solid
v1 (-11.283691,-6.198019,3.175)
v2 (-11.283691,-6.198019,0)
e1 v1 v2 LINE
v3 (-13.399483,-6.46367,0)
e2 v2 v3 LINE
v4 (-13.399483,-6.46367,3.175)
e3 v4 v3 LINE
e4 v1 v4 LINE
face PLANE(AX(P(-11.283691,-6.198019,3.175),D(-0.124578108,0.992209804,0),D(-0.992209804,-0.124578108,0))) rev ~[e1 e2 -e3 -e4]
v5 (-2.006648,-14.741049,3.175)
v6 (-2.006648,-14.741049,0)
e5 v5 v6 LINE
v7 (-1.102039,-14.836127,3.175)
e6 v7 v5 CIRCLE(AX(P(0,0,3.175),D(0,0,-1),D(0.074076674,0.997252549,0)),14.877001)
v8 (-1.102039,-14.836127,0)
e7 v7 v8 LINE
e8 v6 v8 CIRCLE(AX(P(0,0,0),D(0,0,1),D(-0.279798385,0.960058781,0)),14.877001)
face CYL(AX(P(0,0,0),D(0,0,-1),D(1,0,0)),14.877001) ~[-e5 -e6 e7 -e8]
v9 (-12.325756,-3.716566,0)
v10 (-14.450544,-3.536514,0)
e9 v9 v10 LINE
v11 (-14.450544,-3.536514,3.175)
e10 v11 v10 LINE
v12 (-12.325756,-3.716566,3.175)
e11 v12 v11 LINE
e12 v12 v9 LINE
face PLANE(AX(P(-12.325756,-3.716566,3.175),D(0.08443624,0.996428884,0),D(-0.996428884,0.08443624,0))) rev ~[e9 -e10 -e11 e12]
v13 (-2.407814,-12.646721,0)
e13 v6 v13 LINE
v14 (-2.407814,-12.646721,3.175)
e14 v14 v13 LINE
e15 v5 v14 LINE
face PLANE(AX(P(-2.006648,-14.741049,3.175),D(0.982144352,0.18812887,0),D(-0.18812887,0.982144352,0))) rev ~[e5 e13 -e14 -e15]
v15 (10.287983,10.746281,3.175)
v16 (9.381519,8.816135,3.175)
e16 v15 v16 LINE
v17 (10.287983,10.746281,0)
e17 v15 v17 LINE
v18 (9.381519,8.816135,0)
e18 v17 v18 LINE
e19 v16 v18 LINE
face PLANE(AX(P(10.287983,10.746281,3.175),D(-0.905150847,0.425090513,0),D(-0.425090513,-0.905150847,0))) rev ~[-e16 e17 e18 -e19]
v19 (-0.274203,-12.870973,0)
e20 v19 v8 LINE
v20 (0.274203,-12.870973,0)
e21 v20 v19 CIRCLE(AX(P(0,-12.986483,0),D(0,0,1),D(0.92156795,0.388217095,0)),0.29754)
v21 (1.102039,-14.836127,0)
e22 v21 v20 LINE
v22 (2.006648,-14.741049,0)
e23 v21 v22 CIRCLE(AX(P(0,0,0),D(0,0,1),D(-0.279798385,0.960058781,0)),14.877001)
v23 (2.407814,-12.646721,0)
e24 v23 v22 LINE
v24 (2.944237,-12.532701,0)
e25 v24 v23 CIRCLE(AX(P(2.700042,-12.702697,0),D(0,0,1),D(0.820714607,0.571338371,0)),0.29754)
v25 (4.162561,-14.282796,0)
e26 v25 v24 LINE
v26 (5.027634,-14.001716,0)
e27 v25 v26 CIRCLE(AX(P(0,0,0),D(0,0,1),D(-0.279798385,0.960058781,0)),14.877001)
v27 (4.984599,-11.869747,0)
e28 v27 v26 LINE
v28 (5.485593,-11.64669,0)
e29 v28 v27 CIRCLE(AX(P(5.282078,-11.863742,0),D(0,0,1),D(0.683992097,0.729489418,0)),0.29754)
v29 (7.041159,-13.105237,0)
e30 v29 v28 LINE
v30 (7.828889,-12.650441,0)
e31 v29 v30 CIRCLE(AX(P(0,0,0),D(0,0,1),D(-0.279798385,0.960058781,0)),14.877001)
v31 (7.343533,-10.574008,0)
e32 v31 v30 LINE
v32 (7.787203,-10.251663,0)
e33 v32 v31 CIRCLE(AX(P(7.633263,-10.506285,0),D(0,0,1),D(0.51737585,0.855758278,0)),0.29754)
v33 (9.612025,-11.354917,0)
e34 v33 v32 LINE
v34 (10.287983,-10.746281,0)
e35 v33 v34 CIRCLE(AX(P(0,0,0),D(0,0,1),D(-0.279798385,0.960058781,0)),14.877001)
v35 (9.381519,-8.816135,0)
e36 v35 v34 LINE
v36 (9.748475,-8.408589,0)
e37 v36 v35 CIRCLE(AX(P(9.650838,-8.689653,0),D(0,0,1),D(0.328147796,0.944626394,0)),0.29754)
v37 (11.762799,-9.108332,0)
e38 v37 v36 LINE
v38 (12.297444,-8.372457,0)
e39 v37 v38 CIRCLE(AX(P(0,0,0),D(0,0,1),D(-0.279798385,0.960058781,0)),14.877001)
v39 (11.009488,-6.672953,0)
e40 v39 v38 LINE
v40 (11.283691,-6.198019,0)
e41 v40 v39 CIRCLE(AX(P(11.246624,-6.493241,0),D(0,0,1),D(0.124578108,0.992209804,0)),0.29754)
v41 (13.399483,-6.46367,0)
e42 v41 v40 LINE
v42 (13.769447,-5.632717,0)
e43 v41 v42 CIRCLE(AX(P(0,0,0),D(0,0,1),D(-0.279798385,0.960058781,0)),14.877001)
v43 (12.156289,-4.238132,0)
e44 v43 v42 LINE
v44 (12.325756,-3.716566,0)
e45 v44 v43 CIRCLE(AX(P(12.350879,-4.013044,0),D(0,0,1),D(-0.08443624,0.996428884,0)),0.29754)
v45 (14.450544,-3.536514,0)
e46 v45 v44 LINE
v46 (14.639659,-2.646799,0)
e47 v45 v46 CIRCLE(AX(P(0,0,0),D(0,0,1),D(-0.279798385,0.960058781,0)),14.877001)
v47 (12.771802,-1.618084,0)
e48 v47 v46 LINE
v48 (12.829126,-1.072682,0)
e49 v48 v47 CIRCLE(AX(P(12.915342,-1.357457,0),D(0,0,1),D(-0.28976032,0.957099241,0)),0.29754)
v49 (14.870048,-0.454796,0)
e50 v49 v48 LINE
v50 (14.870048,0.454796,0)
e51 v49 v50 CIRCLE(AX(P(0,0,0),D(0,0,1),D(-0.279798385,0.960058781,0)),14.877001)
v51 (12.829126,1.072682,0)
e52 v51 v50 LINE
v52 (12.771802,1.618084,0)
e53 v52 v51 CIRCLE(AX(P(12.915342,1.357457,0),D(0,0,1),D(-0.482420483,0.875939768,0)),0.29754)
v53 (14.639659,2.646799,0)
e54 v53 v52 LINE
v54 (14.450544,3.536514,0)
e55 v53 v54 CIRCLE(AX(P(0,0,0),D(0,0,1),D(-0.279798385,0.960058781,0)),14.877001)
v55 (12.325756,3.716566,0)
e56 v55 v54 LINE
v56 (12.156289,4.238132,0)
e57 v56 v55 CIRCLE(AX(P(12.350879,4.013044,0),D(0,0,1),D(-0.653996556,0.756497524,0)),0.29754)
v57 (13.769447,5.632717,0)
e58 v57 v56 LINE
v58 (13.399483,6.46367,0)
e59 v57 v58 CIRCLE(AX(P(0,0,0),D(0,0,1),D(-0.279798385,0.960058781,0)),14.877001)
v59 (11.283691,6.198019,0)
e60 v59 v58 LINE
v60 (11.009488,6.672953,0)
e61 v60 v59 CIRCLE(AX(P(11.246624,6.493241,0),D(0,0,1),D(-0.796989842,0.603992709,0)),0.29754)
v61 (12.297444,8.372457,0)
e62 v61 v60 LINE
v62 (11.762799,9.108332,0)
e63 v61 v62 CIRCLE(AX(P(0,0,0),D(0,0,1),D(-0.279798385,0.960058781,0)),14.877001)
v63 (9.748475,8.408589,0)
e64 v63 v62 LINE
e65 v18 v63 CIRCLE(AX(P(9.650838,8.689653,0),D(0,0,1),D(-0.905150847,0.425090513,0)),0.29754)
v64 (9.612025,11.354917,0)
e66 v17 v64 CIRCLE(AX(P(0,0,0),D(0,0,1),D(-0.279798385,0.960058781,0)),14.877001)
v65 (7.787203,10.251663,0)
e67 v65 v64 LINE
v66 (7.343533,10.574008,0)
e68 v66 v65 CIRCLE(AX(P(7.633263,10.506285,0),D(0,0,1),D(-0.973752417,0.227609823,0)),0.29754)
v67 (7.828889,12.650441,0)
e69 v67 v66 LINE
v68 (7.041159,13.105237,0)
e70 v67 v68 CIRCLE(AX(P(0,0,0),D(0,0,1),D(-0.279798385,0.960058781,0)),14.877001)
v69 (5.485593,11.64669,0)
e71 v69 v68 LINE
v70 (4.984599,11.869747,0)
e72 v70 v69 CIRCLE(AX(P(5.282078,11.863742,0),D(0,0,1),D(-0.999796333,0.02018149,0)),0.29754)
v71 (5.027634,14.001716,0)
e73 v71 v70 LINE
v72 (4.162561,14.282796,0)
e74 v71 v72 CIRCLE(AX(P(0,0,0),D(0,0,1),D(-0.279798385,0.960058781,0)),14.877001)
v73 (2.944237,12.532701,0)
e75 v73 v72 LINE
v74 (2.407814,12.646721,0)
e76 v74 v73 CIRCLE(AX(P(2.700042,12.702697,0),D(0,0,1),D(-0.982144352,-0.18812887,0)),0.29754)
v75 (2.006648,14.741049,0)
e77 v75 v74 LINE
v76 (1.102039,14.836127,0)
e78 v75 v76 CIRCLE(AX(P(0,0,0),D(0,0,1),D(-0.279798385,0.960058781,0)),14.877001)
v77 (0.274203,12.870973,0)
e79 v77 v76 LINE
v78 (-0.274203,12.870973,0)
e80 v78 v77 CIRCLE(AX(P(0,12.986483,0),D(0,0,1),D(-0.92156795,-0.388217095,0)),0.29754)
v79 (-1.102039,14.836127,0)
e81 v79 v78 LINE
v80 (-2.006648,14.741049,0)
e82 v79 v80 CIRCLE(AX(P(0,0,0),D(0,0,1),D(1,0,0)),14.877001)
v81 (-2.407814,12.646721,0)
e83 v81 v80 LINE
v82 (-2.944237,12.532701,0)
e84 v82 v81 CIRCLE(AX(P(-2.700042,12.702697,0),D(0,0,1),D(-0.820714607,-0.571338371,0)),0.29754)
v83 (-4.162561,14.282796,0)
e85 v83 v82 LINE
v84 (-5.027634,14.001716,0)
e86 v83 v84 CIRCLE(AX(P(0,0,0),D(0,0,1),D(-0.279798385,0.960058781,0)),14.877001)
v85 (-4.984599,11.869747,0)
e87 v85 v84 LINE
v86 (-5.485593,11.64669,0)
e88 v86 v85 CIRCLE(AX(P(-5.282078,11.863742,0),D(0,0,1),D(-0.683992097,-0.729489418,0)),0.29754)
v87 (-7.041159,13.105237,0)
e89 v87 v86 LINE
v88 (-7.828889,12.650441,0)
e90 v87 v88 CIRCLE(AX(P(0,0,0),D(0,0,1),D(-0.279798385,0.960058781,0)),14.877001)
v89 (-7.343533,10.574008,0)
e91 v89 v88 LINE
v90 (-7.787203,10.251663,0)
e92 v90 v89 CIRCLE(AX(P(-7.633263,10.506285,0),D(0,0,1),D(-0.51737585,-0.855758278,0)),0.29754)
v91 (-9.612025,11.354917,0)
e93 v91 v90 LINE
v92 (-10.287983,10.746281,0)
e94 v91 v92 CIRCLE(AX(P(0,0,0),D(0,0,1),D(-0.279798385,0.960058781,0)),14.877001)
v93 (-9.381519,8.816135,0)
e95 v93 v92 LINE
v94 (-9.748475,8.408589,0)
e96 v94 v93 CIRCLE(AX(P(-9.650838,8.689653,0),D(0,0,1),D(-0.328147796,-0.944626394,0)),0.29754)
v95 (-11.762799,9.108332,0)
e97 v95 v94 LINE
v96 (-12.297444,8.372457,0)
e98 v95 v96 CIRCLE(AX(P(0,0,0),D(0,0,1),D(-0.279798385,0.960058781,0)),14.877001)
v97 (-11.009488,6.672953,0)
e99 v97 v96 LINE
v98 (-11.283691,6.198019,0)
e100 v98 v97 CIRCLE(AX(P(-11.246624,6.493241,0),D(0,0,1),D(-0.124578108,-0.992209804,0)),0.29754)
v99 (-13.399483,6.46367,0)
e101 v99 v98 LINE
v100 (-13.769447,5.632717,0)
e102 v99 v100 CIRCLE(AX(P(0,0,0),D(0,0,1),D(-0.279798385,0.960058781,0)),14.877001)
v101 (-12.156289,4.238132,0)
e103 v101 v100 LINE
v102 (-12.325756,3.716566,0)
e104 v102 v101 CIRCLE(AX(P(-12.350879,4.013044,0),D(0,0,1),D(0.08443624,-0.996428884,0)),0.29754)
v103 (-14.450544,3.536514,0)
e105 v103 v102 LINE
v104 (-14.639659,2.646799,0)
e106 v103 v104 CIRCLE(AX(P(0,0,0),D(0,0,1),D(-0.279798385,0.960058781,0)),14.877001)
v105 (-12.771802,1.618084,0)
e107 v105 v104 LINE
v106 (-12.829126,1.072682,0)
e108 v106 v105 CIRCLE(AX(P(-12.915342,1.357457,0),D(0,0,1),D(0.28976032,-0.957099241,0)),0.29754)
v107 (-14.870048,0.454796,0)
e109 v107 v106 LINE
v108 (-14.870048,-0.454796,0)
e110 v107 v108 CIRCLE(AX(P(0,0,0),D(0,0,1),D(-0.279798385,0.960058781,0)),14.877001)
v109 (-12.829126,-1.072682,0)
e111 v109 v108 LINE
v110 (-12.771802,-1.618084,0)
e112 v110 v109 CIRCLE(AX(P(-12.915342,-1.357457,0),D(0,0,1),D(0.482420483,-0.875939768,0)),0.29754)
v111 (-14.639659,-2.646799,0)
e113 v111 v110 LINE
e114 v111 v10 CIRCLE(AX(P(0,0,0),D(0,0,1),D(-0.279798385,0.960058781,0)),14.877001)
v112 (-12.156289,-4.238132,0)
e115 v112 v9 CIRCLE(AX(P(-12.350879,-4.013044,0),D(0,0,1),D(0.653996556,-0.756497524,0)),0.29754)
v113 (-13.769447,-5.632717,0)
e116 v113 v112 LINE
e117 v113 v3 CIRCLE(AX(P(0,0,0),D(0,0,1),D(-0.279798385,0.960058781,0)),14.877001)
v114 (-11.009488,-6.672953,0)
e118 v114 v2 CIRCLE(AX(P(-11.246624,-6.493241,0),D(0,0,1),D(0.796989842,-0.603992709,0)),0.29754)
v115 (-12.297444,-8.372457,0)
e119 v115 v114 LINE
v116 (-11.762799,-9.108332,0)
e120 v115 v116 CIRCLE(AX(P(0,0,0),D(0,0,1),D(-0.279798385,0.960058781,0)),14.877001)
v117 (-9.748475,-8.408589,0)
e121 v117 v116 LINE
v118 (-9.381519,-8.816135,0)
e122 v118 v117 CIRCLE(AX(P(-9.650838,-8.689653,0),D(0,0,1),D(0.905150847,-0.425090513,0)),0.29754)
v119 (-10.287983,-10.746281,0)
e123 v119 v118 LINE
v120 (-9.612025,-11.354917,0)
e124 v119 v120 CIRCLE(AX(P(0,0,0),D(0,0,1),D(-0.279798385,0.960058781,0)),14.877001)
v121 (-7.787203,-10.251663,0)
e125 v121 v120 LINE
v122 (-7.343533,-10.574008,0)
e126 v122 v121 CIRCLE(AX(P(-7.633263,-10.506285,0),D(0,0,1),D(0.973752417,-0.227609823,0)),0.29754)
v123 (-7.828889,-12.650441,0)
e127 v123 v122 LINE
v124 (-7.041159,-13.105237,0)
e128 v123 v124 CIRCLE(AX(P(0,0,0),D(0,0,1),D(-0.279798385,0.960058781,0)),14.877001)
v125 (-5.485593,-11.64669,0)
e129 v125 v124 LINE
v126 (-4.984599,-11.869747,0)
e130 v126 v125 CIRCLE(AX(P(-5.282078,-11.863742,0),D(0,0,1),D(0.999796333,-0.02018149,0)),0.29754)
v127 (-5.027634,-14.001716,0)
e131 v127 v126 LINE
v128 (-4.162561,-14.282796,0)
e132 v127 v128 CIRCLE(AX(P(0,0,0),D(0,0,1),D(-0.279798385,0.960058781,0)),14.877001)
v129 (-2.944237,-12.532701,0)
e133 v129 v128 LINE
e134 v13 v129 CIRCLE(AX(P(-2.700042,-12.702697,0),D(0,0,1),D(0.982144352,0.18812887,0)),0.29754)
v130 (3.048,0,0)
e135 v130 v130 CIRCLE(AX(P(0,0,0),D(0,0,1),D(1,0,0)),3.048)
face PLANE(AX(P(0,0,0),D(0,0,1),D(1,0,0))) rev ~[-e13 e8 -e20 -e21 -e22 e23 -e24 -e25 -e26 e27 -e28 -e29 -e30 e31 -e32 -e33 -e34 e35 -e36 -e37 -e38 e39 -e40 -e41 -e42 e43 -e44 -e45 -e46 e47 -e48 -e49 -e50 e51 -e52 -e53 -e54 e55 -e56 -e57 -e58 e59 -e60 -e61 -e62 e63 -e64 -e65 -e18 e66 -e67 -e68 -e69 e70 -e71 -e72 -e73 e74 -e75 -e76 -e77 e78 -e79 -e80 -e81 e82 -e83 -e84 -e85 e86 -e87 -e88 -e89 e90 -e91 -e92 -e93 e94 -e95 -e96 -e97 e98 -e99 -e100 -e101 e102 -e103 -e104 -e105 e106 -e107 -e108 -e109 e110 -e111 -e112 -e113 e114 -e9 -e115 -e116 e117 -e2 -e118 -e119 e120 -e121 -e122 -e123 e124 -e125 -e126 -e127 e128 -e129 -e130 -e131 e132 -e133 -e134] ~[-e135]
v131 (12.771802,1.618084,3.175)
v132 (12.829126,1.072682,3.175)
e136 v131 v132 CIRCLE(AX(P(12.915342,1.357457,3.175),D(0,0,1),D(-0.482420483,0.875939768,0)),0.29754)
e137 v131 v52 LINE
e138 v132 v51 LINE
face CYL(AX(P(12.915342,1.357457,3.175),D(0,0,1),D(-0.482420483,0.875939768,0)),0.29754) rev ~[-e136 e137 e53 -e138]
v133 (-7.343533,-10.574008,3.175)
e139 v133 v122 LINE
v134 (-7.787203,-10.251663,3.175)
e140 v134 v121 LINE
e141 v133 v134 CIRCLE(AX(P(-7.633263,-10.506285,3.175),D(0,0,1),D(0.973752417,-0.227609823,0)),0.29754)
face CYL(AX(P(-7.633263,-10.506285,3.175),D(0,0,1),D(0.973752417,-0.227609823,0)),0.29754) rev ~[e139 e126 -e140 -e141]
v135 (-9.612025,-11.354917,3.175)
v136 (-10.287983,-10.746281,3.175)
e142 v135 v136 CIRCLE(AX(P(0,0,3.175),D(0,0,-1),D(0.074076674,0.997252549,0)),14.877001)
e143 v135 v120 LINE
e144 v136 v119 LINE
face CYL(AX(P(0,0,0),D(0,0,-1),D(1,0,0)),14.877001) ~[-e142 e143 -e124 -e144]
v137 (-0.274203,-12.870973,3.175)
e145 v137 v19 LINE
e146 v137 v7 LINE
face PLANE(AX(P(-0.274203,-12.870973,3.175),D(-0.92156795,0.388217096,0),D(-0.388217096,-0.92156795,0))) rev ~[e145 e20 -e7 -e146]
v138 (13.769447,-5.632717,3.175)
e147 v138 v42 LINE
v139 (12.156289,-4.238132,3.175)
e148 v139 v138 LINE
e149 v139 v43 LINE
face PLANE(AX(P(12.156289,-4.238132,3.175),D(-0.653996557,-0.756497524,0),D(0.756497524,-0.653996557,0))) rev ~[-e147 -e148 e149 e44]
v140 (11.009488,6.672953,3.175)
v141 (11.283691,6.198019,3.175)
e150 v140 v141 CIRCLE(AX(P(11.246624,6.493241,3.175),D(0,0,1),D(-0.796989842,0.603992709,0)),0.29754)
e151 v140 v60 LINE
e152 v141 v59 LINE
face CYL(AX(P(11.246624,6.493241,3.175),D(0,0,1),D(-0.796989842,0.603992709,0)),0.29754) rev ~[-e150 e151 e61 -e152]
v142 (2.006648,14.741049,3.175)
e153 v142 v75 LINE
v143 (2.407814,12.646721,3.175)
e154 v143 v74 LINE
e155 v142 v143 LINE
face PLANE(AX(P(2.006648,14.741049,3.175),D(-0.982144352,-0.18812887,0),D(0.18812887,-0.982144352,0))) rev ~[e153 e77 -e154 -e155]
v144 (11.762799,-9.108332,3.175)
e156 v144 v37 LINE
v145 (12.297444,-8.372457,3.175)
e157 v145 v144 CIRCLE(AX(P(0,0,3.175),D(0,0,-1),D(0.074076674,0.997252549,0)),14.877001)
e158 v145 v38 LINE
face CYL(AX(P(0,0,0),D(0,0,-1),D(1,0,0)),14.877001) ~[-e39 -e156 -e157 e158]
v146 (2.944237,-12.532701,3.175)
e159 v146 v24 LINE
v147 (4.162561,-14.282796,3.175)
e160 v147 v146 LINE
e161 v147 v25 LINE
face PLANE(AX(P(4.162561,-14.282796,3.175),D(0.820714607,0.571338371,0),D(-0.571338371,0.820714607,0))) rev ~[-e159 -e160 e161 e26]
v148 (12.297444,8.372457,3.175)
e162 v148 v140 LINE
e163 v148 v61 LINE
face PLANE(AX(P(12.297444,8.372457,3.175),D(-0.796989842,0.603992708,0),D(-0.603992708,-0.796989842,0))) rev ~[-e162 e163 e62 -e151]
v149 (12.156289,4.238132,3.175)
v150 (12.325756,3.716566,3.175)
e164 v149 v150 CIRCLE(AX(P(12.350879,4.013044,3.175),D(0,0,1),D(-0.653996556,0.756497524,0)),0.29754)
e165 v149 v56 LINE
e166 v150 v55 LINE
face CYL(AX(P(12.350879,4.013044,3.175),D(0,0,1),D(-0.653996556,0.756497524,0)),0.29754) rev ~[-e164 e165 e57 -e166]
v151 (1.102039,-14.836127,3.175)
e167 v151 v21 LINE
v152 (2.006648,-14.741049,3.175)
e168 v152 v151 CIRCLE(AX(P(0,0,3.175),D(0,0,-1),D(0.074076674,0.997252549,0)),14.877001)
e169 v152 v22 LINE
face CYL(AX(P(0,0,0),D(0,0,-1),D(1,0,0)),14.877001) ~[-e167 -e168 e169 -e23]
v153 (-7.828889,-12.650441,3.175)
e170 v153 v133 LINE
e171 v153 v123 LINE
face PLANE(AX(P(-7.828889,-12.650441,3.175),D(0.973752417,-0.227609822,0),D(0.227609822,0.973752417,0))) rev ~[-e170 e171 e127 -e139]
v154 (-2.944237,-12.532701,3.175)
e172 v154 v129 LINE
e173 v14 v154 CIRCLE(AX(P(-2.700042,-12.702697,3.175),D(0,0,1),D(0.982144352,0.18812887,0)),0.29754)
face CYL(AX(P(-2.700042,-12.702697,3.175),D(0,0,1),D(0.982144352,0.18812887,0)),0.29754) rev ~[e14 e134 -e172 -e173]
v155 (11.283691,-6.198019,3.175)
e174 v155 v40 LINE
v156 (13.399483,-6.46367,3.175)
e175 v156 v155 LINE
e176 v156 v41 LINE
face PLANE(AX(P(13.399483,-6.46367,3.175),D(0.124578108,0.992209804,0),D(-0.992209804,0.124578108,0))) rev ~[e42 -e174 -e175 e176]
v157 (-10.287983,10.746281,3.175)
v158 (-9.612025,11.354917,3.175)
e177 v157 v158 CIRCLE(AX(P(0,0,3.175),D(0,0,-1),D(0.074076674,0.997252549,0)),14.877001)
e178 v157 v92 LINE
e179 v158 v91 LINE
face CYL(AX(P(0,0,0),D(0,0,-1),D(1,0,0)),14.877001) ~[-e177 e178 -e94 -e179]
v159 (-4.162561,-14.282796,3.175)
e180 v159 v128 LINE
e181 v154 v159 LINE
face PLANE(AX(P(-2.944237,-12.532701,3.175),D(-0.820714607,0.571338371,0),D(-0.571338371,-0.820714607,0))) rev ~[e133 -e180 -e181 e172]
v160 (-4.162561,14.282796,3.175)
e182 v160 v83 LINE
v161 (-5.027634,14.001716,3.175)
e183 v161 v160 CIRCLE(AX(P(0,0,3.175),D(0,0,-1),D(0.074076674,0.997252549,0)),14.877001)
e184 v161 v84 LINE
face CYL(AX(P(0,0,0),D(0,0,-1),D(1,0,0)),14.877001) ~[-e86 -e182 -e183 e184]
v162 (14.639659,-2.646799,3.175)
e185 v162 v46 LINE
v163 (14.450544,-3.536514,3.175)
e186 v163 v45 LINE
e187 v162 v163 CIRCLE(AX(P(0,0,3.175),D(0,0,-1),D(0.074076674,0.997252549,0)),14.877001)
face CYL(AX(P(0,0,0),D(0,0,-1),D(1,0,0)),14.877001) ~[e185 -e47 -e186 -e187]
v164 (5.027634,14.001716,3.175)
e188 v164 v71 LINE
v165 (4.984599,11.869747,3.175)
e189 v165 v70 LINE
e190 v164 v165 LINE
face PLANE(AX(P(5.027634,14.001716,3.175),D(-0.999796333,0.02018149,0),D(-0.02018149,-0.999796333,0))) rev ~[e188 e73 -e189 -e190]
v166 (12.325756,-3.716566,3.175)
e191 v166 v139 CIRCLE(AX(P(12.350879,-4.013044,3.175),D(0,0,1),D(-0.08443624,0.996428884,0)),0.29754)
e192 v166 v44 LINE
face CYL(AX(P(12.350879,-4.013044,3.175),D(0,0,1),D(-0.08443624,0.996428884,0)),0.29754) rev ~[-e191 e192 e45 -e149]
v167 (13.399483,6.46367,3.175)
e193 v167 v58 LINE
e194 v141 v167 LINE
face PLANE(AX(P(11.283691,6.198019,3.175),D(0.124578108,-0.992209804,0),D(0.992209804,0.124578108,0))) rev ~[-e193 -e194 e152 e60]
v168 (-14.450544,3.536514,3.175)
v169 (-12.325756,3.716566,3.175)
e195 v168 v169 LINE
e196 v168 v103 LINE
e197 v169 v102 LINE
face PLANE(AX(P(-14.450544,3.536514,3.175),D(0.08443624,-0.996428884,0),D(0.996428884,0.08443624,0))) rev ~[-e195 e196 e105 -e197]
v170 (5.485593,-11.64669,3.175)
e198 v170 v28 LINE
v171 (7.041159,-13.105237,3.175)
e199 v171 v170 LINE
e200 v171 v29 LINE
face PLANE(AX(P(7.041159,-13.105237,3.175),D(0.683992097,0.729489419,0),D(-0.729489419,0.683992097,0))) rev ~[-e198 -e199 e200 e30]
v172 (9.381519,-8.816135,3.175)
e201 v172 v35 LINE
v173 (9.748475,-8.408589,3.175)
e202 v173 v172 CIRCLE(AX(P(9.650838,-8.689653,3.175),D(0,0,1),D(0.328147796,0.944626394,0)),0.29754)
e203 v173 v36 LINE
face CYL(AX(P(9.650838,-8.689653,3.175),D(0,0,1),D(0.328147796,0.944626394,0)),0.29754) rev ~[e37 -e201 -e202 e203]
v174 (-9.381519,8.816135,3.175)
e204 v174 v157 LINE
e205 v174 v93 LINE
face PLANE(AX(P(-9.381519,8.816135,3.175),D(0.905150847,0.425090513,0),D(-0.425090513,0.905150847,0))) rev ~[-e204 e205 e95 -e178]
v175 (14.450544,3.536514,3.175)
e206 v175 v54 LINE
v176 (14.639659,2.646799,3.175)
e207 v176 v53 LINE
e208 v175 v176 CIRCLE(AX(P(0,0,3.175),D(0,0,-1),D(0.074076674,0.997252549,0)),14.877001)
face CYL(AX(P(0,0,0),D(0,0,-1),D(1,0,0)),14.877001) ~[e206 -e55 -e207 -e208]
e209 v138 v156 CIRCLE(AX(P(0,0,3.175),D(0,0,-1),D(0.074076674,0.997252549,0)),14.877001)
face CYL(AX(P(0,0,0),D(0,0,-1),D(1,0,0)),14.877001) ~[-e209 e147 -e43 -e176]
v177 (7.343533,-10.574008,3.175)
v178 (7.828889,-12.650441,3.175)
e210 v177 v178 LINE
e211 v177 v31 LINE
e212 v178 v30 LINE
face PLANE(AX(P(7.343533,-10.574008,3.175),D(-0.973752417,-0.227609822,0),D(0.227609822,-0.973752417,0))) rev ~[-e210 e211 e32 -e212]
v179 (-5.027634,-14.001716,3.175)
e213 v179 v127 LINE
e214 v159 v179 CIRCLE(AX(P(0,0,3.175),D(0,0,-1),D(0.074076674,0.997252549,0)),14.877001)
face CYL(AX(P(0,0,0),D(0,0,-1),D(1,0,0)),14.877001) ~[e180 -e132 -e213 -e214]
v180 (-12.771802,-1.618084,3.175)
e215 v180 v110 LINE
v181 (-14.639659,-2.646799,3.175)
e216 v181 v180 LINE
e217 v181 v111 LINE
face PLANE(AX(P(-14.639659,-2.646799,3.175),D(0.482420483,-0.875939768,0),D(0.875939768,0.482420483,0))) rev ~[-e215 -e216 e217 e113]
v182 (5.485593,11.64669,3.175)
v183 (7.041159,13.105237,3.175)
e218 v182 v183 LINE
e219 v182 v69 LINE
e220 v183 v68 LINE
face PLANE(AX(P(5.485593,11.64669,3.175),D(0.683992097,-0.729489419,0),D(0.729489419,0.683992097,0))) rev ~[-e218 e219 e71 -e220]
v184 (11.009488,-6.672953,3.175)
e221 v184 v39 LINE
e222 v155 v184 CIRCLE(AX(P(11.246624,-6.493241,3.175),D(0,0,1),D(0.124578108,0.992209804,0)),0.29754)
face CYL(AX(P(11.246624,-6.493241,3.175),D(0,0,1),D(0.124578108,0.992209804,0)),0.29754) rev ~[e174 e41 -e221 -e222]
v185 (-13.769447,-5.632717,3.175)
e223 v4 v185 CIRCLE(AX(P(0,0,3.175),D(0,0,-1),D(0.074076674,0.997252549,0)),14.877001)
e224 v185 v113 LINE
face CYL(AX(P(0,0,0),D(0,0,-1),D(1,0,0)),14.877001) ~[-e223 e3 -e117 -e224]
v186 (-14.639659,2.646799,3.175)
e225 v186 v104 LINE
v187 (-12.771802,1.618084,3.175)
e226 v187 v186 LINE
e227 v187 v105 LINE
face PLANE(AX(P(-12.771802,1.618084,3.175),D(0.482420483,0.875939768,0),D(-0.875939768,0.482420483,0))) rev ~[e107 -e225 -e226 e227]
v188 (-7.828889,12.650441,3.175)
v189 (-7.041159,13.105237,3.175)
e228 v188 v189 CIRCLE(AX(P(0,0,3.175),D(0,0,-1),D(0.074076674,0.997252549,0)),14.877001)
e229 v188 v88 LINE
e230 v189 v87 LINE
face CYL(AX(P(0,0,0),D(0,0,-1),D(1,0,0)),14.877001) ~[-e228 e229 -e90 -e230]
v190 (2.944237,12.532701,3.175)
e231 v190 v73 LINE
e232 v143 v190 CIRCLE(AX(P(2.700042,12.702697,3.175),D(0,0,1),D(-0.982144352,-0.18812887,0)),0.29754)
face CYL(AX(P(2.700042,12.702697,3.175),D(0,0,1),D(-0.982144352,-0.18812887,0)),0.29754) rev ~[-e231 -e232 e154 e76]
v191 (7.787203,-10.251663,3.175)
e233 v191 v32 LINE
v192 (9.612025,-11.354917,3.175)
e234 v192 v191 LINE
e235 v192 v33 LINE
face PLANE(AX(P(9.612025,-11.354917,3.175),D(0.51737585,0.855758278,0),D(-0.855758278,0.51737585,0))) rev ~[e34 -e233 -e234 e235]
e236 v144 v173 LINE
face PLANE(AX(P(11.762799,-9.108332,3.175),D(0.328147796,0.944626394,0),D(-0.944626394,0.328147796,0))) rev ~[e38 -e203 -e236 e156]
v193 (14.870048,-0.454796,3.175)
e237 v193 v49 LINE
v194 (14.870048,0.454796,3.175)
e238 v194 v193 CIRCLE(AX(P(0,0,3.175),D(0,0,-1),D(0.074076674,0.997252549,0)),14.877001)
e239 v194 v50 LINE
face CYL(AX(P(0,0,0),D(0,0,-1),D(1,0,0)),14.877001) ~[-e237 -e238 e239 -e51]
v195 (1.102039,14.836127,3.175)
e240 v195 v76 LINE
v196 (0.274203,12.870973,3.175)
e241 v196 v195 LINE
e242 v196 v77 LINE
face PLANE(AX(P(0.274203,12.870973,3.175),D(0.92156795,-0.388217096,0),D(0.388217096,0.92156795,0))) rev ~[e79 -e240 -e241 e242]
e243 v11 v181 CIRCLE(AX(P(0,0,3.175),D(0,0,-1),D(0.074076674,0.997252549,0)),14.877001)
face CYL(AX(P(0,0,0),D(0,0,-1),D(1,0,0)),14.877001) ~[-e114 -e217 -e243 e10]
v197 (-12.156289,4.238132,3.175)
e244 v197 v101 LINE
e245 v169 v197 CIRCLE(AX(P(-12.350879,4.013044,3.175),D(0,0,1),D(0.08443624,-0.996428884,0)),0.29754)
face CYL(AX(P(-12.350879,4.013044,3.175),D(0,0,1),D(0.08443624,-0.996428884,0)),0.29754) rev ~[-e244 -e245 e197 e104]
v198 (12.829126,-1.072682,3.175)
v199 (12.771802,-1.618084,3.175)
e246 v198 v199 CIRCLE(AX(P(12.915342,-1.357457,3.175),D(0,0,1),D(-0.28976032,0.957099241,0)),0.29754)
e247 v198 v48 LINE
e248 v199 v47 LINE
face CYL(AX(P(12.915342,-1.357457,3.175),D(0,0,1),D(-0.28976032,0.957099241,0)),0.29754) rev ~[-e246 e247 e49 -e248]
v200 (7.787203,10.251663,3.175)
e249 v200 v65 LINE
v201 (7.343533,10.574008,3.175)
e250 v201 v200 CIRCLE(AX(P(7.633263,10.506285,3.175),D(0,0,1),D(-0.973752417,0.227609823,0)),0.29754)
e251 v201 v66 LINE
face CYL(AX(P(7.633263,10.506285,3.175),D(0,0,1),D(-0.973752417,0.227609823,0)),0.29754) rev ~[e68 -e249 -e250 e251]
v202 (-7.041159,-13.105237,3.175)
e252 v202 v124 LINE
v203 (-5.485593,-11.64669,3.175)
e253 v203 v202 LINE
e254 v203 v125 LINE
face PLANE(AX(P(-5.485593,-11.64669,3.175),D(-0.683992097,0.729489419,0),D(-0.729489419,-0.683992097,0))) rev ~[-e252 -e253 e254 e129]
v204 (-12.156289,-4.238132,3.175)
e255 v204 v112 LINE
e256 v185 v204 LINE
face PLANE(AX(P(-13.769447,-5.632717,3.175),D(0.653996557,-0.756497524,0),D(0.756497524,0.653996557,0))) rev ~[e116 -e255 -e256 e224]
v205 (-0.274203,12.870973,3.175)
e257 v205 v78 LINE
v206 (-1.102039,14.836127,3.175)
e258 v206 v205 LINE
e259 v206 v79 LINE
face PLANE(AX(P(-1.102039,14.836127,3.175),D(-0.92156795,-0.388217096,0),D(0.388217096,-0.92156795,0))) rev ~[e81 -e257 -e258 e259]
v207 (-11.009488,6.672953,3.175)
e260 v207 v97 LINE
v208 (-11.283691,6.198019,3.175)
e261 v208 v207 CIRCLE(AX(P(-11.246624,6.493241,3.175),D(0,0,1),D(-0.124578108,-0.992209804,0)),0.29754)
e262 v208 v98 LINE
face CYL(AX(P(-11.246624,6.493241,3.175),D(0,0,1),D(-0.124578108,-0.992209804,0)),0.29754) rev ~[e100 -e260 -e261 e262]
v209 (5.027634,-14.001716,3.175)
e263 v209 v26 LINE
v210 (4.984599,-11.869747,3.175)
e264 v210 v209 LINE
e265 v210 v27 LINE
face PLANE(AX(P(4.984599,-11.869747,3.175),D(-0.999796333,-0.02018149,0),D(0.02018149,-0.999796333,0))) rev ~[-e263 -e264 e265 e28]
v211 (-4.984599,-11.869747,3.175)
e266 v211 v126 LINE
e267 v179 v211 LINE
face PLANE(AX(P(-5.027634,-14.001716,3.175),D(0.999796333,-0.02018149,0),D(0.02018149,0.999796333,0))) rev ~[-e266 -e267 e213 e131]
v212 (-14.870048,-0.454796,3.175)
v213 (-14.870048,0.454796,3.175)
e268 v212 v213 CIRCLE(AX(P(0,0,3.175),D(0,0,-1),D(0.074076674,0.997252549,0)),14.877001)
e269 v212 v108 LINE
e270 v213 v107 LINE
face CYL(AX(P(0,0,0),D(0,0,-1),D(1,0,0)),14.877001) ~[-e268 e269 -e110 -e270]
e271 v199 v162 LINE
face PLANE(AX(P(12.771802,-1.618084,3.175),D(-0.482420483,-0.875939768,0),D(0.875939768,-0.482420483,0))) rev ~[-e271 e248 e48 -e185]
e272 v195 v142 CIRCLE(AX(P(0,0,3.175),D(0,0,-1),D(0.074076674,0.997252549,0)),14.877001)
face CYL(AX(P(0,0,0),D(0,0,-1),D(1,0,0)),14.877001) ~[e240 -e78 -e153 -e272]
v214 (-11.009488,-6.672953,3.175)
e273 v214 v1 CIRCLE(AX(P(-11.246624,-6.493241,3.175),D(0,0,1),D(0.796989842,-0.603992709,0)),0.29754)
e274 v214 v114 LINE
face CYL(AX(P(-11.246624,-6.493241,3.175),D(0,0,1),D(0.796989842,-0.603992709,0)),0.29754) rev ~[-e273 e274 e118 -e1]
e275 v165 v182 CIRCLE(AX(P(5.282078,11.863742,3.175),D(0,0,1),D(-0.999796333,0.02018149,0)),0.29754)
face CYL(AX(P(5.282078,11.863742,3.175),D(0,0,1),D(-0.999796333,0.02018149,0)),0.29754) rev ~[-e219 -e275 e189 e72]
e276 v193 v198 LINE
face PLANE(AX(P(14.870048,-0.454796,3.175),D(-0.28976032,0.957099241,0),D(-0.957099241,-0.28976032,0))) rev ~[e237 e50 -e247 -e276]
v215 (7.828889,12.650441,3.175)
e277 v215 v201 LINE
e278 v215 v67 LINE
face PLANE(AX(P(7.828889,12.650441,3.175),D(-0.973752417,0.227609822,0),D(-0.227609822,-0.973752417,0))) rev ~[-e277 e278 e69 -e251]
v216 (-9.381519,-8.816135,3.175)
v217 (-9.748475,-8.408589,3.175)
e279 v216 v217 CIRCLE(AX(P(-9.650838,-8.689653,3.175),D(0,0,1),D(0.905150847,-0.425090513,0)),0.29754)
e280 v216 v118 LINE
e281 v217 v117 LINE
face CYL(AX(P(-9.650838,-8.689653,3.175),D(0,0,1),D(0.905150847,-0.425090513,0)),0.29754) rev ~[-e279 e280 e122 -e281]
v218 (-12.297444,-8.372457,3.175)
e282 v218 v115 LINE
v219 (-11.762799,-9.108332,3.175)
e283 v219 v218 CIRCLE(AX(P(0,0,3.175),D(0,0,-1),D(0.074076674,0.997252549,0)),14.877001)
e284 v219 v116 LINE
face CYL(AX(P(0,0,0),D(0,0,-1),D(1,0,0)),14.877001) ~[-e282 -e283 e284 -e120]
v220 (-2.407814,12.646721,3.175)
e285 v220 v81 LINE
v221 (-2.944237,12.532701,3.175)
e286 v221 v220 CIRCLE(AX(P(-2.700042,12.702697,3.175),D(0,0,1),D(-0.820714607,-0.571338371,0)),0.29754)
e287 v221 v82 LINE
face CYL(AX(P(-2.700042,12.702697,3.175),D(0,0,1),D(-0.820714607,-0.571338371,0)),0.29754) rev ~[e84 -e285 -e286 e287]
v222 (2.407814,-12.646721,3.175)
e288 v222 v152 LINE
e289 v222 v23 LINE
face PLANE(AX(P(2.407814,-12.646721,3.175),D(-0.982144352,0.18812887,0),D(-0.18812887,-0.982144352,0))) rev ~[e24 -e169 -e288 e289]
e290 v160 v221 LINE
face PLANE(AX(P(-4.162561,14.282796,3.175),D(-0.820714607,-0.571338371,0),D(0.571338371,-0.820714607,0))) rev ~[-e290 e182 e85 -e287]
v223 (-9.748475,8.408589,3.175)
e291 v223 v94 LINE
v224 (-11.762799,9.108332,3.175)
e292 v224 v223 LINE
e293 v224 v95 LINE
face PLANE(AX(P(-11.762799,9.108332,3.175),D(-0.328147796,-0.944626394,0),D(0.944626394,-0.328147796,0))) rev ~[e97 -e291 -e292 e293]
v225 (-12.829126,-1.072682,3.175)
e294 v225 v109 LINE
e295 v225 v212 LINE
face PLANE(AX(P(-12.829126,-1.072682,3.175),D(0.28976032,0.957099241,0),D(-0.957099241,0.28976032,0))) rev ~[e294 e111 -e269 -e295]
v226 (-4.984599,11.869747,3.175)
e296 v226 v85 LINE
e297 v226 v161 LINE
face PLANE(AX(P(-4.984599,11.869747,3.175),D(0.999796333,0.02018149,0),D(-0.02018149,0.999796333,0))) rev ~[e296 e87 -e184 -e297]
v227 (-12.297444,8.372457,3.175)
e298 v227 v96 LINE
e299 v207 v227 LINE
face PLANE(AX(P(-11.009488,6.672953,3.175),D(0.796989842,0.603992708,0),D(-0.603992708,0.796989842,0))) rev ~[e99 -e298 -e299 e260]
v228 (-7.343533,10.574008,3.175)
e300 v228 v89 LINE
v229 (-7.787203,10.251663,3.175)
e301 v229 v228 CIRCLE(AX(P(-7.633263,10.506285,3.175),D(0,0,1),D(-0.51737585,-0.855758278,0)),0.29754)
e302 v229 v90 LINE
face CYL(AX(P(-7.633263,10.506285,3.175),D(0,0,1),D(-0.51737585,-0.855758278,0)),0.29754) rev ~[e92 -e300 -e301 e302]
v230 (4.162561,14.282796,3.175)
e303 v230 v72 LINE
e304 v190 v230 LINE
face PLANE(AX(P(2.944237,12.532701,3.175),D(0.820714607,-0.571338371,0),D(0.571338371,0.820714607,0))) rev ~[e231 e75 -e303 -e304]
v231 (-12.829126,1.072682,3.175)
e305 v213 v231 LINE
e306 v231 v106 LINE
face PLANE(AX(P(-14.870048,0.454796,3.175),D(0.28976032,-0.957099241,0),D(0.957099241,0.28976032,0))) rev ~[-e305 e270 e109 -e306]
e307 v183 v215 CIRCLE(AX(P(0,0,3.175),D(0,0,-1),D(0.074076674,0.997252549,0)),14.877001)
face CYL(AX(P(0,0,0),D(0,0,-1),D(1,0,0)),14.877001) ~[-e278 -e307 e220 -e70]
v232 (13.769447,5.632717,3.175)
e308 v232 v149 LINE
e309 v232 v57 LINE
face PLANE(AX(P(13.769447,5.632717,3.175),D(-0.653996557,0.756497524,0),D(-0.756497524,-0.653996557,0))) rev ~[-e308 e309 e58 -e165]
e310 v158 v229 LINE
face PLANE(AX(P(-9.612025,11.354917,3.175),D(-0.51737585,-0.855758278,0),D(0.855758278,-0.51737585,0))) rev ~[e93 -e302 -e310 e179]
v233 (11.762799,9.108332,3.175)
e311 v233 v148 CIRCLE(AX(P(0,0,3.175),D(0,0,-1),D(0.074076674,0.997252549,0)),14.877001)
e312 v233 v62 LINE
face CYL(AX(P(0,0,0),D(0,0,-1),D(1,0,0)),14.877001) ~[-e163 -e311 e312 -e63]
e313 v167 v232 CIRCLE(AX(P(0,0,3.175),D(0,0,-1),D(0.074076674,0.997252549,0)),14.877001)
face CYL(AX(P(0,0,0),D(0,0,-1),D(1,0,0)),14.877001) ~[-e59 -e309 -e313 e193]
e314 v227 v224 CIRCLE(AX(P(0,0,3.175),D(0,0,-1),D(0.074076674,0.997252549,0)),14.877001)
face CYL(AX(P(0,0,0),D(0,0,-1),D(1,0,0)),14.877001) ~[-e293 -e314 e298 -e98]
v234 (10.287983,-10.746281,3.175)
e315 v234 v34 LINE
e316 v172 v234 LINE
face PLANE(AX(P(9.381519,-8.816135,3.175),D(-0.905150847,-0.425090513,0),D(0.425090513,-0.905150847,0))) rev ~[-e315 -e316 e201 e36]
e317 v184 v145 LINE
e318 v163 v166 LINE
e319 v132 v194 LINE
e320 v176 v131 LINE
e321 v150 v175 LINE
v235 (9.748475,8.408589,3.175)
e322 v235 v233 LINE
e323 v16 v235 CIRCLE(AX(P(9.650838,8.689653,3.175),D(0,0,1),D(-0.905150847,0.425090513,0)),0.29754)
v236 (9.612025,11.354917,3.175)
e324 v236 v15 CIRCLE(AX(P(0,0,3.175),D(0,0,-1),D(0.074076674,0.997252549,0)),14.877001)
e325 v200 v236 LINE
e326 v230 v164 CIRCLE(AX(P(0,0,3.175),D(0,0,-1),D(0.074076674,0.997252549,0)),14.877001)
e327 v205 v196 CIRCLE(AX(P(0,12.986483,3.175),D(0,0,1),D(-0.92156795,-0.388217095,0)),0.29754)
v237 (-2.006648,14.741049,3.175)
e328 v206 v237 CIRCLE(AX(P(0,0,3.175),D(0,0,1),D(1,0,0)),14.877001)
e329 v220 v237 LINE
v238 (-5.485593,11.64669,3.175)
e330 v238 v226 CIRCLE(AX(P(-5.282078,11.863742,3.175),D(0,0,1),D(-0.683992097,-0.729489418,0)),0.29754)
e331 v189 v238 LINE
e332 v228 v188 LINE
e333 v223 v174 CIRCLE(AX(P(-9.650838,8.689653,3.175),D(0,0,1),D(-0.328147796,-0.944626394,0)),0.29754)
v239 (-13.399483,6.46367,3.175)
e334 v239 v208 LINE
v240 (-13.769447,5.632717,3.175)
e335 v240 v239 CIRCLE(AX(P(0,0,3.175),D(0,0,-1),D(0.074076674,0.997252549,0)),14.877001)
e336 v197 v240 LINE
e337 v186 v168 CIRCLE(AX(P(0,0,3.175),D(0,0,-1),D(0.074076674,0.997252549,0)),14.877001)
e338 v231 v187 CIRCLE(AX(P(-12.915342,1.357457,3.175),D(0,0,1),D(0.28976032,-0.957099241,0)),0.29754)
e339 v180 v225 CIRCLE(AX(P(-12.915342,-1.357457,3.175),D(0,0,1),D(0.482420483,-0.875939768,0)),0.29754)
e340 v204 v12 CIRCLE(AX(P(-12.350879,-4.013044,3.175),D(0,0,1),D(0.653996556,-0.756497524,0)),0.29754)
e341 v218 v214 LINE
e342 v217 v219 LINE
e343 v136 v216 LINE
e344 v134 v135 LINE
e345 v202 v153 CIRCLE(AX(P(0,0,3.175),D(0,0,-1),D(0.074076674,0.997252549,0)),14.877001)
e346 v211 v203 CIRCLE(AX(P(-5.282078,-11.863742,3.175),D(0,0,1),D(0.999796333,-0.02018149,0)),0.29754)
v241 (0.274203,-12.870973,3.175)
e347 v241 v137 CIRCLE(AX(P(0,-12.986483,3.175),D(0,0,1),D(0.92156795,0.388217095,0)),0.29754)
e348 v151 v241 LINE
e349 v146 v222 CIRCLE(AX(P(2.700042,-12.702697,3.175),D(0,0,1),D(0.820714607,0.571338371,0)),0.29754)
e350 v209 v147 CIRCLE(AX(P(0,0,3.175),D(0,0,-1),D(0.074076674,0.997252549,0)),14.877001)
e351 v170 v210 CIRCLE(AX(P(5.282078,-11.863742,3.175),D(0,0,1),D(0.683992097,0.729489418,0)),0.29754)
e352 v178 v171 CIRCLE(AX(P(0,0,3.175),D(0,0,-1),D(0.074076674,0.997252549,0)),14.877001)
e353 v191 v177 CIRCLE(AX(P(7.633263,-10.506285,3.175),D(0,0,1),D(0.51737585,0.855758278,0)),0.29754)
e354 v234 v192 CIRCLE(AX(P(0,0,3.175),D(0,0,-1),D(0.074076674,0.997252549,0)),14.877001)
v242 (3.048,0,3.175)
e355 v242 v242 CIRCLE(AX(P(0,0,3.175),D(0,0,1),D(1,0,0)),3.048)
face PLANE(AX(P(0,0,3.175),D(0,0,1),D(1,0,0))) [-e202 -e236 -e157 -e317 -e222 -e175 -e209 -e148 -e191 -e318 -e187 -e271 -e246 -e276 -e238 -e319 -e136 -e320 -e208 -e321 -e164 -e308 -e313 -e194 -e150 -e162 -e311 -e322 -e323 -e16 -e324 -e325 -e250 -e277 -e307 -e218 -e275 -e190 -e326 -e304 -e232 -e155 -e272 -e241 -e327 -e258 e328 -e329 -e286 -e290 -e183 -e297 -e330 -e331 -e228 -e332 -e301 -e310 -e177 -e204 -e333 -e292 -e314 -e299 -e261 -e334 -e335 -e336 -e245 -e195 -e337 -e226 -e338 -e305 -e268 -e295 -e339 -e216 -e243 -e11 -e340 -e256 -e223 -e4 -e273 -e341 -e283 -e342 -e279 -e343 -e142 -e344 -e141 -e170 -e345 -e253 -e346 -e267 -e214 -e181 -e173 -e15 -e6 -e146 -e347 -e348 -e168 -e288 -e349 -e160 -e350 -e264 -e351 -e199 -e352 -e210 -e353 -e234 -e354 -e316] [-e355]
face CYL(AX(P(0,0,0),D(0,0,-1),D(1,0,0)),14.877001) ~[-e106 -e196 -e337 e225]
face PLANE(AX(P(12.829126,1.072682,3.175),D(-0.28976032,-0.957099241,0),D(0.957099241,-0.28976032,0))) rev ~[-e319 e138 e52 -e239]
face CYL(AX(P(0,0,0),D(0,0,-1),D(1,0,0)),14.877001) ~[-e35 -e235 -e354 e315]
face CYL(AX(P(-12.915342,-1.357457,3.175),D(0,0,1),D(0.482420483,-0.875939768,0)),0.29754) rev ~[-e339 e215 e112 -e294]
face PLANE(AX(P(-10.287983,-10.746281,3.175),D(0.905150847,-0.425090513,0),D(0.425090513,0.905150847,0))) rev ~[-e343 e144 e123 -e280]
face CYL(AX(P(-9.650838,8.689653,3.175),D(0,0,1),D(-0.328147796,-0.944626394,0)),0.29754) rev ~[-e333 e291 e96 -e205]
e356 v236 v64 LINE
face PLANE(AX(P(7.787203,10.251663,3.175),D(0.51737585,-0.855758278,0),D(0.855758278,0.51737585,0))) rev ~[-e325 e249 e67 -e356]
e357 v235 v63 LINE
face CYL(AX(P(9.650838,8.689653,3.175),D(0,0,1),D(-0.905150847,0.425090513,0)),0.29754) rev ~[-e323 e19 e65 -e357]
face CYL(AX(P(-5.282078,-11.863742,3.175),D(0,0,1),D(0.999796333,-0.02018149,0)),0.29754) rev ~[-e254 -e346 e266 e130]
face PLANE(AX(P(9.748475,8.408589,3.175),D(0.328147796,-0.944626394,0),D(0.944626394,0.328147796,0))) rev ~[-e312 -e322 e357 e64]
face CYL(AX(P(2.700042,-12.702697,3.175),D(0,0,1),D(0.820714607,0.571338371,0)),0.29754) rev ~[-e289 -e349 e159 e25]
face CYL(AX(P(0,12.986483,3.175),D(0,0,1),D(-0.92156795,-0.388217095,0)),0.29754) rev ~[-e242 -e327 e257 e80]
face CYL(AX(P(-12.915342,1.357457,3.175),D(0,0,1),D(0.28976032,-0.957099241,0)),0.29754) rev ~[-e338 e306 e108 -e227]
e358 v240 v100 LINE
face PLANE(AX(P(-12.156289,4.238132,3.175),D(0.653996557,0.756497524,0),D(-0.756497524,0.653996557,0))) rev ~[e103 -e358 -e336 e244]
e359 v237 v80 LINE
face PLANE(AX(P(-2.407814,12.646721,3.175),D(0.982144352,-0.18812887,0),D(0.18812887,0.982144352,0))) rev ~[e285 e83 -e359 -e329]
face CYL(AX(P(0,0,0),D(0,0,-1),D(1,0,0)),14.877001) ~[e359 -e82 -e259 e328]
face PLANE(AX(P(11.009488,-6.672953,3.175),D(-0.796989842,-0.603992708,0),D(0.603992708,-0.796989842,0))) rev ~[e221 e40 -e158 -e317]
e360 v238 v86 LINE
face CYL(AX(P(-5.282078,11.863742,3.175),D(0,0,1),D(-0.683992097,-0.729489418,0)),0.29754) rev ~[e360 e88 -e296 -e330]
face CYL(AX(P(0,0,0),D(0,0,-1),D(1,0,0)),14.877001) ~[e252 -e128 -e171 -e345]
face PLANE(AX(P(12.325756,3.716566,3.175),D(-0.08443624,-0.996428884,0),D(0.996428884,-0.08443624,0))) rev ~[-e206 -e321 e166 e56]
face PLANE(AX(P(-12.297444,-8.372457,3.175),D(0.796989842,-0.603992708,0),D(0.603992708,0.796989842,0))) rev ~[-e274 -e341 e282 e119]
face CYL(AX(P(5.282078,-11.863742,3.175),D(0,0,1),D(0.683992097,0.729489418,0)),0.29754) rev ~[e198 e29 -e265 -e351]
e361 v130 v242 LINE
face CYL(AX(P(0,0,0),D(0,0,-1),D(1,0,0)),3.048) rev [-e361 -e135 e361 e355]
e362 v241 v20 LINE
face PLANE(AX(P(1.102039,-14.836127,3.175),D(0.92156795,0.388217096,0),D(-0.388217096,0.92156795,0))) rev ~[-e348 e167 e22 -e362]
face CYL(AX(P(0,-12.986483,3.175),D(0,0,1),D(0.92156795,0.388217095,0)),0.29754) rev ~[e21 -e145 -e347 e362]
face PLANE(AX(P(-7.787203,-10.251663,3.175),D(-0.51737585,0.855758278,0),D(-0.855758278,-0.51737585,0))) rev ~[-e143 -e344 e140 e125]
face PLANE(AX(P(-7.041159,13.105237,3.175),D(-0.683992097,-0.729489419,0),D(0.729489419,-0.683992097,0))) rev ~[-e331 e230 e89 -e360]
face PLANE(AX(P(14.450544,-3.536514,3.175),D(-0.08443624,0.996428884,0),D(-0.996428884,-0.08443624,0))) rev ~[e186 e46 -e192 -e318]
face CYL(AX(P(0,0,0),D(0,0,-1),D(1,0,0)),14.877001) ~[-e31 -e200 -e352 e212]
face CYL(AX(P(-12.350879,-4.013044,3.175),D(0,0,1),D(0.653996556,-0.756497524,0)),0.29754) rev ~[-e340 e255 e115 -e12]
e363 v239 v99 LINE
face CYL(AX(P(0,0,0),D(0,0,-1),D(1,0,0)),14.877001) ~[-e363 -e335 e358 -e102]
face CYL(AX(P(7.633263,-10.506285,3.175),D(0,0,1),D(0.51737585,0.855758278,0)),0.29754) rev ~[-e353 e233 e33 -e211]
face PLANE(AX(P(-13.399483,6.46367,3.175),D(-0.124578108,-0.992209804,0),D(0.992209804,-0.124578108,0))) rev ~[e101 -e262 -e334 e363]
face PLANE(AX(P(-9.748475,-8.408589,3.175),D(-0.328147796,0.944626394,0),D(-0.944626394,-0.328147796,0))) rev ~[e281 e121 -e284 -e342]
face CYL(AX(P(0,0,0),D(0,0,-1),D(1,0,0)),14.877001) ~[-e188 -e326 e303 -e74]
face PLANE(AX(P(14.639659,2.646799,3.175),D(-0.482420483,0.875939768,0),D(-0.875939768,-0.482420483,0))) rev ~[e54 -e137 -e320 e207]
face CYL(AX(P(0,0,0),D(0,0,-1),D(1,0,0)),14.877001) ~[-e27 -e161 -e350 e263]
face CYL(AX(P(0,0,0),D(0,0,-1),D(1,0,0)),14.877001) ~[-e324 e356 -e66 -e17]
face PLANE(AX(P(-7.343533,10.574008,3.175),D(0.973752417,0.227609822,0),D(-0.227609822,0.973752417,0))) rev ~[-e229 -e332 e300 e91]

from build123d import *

# Parameters (mm, degrees)
F0_R            = 14.8770011714
F0_R_2          = 3.048
F1_DEPTH        = 3.175
F3_DEPTH        = 3.175
F3_COPIES_COUNT = 30


# Not quite as in the source:
# - a pattern or mirror of a feature is missing from the dataset's text; its kind, count and spacing are read off the source's solid


with BuildPart() as f1:
    # F0 (on Top) → F1 (new body)
    with BuildSketch(Plane.XY):
        Circle(F0_R)
        Circle(F0_R_2, mode=Mode.SUBTRACT)
    extrude(amount=F1_DEPTH)

    # F2 (on face) → F3 (cut, through all)
    with BuildSketch(Plane.XY.offset(3.175)):
        with BuildLine():
            Line((0.2742033495, 12.8709727929), (1.1020387684, 14.8361273386))
            ThreePointArc((1.1020387684, 14.8361273386), (0, 14.8770011714), (-1.1020387684, 14.8361273386))
            Line((-1.1020387684, 14.8361273386), (-0.2742033495, 12.8709727929))
            ThreePointArc((-0.2742033495, 12.8709727929), (0, 12.6889428931), (0.2742033495, 12.8709727929))
        make_face()
    f3 = extrude(amount=-F3_DEPTH, mode=Mode.SUBTRACT)

    # F3_copies: F3 ×30 about axis
    f3_copies_axis = Axis((0, 0, 0), (0, 0, 1))
    for i in range(1, F3_COPIES_COUNT):
        add(f3.rotate(f3_copies_axis, i * 360 / F3_COPIES_COUNT), mode=Mode.SUBTRACT)


solid = f1.part
